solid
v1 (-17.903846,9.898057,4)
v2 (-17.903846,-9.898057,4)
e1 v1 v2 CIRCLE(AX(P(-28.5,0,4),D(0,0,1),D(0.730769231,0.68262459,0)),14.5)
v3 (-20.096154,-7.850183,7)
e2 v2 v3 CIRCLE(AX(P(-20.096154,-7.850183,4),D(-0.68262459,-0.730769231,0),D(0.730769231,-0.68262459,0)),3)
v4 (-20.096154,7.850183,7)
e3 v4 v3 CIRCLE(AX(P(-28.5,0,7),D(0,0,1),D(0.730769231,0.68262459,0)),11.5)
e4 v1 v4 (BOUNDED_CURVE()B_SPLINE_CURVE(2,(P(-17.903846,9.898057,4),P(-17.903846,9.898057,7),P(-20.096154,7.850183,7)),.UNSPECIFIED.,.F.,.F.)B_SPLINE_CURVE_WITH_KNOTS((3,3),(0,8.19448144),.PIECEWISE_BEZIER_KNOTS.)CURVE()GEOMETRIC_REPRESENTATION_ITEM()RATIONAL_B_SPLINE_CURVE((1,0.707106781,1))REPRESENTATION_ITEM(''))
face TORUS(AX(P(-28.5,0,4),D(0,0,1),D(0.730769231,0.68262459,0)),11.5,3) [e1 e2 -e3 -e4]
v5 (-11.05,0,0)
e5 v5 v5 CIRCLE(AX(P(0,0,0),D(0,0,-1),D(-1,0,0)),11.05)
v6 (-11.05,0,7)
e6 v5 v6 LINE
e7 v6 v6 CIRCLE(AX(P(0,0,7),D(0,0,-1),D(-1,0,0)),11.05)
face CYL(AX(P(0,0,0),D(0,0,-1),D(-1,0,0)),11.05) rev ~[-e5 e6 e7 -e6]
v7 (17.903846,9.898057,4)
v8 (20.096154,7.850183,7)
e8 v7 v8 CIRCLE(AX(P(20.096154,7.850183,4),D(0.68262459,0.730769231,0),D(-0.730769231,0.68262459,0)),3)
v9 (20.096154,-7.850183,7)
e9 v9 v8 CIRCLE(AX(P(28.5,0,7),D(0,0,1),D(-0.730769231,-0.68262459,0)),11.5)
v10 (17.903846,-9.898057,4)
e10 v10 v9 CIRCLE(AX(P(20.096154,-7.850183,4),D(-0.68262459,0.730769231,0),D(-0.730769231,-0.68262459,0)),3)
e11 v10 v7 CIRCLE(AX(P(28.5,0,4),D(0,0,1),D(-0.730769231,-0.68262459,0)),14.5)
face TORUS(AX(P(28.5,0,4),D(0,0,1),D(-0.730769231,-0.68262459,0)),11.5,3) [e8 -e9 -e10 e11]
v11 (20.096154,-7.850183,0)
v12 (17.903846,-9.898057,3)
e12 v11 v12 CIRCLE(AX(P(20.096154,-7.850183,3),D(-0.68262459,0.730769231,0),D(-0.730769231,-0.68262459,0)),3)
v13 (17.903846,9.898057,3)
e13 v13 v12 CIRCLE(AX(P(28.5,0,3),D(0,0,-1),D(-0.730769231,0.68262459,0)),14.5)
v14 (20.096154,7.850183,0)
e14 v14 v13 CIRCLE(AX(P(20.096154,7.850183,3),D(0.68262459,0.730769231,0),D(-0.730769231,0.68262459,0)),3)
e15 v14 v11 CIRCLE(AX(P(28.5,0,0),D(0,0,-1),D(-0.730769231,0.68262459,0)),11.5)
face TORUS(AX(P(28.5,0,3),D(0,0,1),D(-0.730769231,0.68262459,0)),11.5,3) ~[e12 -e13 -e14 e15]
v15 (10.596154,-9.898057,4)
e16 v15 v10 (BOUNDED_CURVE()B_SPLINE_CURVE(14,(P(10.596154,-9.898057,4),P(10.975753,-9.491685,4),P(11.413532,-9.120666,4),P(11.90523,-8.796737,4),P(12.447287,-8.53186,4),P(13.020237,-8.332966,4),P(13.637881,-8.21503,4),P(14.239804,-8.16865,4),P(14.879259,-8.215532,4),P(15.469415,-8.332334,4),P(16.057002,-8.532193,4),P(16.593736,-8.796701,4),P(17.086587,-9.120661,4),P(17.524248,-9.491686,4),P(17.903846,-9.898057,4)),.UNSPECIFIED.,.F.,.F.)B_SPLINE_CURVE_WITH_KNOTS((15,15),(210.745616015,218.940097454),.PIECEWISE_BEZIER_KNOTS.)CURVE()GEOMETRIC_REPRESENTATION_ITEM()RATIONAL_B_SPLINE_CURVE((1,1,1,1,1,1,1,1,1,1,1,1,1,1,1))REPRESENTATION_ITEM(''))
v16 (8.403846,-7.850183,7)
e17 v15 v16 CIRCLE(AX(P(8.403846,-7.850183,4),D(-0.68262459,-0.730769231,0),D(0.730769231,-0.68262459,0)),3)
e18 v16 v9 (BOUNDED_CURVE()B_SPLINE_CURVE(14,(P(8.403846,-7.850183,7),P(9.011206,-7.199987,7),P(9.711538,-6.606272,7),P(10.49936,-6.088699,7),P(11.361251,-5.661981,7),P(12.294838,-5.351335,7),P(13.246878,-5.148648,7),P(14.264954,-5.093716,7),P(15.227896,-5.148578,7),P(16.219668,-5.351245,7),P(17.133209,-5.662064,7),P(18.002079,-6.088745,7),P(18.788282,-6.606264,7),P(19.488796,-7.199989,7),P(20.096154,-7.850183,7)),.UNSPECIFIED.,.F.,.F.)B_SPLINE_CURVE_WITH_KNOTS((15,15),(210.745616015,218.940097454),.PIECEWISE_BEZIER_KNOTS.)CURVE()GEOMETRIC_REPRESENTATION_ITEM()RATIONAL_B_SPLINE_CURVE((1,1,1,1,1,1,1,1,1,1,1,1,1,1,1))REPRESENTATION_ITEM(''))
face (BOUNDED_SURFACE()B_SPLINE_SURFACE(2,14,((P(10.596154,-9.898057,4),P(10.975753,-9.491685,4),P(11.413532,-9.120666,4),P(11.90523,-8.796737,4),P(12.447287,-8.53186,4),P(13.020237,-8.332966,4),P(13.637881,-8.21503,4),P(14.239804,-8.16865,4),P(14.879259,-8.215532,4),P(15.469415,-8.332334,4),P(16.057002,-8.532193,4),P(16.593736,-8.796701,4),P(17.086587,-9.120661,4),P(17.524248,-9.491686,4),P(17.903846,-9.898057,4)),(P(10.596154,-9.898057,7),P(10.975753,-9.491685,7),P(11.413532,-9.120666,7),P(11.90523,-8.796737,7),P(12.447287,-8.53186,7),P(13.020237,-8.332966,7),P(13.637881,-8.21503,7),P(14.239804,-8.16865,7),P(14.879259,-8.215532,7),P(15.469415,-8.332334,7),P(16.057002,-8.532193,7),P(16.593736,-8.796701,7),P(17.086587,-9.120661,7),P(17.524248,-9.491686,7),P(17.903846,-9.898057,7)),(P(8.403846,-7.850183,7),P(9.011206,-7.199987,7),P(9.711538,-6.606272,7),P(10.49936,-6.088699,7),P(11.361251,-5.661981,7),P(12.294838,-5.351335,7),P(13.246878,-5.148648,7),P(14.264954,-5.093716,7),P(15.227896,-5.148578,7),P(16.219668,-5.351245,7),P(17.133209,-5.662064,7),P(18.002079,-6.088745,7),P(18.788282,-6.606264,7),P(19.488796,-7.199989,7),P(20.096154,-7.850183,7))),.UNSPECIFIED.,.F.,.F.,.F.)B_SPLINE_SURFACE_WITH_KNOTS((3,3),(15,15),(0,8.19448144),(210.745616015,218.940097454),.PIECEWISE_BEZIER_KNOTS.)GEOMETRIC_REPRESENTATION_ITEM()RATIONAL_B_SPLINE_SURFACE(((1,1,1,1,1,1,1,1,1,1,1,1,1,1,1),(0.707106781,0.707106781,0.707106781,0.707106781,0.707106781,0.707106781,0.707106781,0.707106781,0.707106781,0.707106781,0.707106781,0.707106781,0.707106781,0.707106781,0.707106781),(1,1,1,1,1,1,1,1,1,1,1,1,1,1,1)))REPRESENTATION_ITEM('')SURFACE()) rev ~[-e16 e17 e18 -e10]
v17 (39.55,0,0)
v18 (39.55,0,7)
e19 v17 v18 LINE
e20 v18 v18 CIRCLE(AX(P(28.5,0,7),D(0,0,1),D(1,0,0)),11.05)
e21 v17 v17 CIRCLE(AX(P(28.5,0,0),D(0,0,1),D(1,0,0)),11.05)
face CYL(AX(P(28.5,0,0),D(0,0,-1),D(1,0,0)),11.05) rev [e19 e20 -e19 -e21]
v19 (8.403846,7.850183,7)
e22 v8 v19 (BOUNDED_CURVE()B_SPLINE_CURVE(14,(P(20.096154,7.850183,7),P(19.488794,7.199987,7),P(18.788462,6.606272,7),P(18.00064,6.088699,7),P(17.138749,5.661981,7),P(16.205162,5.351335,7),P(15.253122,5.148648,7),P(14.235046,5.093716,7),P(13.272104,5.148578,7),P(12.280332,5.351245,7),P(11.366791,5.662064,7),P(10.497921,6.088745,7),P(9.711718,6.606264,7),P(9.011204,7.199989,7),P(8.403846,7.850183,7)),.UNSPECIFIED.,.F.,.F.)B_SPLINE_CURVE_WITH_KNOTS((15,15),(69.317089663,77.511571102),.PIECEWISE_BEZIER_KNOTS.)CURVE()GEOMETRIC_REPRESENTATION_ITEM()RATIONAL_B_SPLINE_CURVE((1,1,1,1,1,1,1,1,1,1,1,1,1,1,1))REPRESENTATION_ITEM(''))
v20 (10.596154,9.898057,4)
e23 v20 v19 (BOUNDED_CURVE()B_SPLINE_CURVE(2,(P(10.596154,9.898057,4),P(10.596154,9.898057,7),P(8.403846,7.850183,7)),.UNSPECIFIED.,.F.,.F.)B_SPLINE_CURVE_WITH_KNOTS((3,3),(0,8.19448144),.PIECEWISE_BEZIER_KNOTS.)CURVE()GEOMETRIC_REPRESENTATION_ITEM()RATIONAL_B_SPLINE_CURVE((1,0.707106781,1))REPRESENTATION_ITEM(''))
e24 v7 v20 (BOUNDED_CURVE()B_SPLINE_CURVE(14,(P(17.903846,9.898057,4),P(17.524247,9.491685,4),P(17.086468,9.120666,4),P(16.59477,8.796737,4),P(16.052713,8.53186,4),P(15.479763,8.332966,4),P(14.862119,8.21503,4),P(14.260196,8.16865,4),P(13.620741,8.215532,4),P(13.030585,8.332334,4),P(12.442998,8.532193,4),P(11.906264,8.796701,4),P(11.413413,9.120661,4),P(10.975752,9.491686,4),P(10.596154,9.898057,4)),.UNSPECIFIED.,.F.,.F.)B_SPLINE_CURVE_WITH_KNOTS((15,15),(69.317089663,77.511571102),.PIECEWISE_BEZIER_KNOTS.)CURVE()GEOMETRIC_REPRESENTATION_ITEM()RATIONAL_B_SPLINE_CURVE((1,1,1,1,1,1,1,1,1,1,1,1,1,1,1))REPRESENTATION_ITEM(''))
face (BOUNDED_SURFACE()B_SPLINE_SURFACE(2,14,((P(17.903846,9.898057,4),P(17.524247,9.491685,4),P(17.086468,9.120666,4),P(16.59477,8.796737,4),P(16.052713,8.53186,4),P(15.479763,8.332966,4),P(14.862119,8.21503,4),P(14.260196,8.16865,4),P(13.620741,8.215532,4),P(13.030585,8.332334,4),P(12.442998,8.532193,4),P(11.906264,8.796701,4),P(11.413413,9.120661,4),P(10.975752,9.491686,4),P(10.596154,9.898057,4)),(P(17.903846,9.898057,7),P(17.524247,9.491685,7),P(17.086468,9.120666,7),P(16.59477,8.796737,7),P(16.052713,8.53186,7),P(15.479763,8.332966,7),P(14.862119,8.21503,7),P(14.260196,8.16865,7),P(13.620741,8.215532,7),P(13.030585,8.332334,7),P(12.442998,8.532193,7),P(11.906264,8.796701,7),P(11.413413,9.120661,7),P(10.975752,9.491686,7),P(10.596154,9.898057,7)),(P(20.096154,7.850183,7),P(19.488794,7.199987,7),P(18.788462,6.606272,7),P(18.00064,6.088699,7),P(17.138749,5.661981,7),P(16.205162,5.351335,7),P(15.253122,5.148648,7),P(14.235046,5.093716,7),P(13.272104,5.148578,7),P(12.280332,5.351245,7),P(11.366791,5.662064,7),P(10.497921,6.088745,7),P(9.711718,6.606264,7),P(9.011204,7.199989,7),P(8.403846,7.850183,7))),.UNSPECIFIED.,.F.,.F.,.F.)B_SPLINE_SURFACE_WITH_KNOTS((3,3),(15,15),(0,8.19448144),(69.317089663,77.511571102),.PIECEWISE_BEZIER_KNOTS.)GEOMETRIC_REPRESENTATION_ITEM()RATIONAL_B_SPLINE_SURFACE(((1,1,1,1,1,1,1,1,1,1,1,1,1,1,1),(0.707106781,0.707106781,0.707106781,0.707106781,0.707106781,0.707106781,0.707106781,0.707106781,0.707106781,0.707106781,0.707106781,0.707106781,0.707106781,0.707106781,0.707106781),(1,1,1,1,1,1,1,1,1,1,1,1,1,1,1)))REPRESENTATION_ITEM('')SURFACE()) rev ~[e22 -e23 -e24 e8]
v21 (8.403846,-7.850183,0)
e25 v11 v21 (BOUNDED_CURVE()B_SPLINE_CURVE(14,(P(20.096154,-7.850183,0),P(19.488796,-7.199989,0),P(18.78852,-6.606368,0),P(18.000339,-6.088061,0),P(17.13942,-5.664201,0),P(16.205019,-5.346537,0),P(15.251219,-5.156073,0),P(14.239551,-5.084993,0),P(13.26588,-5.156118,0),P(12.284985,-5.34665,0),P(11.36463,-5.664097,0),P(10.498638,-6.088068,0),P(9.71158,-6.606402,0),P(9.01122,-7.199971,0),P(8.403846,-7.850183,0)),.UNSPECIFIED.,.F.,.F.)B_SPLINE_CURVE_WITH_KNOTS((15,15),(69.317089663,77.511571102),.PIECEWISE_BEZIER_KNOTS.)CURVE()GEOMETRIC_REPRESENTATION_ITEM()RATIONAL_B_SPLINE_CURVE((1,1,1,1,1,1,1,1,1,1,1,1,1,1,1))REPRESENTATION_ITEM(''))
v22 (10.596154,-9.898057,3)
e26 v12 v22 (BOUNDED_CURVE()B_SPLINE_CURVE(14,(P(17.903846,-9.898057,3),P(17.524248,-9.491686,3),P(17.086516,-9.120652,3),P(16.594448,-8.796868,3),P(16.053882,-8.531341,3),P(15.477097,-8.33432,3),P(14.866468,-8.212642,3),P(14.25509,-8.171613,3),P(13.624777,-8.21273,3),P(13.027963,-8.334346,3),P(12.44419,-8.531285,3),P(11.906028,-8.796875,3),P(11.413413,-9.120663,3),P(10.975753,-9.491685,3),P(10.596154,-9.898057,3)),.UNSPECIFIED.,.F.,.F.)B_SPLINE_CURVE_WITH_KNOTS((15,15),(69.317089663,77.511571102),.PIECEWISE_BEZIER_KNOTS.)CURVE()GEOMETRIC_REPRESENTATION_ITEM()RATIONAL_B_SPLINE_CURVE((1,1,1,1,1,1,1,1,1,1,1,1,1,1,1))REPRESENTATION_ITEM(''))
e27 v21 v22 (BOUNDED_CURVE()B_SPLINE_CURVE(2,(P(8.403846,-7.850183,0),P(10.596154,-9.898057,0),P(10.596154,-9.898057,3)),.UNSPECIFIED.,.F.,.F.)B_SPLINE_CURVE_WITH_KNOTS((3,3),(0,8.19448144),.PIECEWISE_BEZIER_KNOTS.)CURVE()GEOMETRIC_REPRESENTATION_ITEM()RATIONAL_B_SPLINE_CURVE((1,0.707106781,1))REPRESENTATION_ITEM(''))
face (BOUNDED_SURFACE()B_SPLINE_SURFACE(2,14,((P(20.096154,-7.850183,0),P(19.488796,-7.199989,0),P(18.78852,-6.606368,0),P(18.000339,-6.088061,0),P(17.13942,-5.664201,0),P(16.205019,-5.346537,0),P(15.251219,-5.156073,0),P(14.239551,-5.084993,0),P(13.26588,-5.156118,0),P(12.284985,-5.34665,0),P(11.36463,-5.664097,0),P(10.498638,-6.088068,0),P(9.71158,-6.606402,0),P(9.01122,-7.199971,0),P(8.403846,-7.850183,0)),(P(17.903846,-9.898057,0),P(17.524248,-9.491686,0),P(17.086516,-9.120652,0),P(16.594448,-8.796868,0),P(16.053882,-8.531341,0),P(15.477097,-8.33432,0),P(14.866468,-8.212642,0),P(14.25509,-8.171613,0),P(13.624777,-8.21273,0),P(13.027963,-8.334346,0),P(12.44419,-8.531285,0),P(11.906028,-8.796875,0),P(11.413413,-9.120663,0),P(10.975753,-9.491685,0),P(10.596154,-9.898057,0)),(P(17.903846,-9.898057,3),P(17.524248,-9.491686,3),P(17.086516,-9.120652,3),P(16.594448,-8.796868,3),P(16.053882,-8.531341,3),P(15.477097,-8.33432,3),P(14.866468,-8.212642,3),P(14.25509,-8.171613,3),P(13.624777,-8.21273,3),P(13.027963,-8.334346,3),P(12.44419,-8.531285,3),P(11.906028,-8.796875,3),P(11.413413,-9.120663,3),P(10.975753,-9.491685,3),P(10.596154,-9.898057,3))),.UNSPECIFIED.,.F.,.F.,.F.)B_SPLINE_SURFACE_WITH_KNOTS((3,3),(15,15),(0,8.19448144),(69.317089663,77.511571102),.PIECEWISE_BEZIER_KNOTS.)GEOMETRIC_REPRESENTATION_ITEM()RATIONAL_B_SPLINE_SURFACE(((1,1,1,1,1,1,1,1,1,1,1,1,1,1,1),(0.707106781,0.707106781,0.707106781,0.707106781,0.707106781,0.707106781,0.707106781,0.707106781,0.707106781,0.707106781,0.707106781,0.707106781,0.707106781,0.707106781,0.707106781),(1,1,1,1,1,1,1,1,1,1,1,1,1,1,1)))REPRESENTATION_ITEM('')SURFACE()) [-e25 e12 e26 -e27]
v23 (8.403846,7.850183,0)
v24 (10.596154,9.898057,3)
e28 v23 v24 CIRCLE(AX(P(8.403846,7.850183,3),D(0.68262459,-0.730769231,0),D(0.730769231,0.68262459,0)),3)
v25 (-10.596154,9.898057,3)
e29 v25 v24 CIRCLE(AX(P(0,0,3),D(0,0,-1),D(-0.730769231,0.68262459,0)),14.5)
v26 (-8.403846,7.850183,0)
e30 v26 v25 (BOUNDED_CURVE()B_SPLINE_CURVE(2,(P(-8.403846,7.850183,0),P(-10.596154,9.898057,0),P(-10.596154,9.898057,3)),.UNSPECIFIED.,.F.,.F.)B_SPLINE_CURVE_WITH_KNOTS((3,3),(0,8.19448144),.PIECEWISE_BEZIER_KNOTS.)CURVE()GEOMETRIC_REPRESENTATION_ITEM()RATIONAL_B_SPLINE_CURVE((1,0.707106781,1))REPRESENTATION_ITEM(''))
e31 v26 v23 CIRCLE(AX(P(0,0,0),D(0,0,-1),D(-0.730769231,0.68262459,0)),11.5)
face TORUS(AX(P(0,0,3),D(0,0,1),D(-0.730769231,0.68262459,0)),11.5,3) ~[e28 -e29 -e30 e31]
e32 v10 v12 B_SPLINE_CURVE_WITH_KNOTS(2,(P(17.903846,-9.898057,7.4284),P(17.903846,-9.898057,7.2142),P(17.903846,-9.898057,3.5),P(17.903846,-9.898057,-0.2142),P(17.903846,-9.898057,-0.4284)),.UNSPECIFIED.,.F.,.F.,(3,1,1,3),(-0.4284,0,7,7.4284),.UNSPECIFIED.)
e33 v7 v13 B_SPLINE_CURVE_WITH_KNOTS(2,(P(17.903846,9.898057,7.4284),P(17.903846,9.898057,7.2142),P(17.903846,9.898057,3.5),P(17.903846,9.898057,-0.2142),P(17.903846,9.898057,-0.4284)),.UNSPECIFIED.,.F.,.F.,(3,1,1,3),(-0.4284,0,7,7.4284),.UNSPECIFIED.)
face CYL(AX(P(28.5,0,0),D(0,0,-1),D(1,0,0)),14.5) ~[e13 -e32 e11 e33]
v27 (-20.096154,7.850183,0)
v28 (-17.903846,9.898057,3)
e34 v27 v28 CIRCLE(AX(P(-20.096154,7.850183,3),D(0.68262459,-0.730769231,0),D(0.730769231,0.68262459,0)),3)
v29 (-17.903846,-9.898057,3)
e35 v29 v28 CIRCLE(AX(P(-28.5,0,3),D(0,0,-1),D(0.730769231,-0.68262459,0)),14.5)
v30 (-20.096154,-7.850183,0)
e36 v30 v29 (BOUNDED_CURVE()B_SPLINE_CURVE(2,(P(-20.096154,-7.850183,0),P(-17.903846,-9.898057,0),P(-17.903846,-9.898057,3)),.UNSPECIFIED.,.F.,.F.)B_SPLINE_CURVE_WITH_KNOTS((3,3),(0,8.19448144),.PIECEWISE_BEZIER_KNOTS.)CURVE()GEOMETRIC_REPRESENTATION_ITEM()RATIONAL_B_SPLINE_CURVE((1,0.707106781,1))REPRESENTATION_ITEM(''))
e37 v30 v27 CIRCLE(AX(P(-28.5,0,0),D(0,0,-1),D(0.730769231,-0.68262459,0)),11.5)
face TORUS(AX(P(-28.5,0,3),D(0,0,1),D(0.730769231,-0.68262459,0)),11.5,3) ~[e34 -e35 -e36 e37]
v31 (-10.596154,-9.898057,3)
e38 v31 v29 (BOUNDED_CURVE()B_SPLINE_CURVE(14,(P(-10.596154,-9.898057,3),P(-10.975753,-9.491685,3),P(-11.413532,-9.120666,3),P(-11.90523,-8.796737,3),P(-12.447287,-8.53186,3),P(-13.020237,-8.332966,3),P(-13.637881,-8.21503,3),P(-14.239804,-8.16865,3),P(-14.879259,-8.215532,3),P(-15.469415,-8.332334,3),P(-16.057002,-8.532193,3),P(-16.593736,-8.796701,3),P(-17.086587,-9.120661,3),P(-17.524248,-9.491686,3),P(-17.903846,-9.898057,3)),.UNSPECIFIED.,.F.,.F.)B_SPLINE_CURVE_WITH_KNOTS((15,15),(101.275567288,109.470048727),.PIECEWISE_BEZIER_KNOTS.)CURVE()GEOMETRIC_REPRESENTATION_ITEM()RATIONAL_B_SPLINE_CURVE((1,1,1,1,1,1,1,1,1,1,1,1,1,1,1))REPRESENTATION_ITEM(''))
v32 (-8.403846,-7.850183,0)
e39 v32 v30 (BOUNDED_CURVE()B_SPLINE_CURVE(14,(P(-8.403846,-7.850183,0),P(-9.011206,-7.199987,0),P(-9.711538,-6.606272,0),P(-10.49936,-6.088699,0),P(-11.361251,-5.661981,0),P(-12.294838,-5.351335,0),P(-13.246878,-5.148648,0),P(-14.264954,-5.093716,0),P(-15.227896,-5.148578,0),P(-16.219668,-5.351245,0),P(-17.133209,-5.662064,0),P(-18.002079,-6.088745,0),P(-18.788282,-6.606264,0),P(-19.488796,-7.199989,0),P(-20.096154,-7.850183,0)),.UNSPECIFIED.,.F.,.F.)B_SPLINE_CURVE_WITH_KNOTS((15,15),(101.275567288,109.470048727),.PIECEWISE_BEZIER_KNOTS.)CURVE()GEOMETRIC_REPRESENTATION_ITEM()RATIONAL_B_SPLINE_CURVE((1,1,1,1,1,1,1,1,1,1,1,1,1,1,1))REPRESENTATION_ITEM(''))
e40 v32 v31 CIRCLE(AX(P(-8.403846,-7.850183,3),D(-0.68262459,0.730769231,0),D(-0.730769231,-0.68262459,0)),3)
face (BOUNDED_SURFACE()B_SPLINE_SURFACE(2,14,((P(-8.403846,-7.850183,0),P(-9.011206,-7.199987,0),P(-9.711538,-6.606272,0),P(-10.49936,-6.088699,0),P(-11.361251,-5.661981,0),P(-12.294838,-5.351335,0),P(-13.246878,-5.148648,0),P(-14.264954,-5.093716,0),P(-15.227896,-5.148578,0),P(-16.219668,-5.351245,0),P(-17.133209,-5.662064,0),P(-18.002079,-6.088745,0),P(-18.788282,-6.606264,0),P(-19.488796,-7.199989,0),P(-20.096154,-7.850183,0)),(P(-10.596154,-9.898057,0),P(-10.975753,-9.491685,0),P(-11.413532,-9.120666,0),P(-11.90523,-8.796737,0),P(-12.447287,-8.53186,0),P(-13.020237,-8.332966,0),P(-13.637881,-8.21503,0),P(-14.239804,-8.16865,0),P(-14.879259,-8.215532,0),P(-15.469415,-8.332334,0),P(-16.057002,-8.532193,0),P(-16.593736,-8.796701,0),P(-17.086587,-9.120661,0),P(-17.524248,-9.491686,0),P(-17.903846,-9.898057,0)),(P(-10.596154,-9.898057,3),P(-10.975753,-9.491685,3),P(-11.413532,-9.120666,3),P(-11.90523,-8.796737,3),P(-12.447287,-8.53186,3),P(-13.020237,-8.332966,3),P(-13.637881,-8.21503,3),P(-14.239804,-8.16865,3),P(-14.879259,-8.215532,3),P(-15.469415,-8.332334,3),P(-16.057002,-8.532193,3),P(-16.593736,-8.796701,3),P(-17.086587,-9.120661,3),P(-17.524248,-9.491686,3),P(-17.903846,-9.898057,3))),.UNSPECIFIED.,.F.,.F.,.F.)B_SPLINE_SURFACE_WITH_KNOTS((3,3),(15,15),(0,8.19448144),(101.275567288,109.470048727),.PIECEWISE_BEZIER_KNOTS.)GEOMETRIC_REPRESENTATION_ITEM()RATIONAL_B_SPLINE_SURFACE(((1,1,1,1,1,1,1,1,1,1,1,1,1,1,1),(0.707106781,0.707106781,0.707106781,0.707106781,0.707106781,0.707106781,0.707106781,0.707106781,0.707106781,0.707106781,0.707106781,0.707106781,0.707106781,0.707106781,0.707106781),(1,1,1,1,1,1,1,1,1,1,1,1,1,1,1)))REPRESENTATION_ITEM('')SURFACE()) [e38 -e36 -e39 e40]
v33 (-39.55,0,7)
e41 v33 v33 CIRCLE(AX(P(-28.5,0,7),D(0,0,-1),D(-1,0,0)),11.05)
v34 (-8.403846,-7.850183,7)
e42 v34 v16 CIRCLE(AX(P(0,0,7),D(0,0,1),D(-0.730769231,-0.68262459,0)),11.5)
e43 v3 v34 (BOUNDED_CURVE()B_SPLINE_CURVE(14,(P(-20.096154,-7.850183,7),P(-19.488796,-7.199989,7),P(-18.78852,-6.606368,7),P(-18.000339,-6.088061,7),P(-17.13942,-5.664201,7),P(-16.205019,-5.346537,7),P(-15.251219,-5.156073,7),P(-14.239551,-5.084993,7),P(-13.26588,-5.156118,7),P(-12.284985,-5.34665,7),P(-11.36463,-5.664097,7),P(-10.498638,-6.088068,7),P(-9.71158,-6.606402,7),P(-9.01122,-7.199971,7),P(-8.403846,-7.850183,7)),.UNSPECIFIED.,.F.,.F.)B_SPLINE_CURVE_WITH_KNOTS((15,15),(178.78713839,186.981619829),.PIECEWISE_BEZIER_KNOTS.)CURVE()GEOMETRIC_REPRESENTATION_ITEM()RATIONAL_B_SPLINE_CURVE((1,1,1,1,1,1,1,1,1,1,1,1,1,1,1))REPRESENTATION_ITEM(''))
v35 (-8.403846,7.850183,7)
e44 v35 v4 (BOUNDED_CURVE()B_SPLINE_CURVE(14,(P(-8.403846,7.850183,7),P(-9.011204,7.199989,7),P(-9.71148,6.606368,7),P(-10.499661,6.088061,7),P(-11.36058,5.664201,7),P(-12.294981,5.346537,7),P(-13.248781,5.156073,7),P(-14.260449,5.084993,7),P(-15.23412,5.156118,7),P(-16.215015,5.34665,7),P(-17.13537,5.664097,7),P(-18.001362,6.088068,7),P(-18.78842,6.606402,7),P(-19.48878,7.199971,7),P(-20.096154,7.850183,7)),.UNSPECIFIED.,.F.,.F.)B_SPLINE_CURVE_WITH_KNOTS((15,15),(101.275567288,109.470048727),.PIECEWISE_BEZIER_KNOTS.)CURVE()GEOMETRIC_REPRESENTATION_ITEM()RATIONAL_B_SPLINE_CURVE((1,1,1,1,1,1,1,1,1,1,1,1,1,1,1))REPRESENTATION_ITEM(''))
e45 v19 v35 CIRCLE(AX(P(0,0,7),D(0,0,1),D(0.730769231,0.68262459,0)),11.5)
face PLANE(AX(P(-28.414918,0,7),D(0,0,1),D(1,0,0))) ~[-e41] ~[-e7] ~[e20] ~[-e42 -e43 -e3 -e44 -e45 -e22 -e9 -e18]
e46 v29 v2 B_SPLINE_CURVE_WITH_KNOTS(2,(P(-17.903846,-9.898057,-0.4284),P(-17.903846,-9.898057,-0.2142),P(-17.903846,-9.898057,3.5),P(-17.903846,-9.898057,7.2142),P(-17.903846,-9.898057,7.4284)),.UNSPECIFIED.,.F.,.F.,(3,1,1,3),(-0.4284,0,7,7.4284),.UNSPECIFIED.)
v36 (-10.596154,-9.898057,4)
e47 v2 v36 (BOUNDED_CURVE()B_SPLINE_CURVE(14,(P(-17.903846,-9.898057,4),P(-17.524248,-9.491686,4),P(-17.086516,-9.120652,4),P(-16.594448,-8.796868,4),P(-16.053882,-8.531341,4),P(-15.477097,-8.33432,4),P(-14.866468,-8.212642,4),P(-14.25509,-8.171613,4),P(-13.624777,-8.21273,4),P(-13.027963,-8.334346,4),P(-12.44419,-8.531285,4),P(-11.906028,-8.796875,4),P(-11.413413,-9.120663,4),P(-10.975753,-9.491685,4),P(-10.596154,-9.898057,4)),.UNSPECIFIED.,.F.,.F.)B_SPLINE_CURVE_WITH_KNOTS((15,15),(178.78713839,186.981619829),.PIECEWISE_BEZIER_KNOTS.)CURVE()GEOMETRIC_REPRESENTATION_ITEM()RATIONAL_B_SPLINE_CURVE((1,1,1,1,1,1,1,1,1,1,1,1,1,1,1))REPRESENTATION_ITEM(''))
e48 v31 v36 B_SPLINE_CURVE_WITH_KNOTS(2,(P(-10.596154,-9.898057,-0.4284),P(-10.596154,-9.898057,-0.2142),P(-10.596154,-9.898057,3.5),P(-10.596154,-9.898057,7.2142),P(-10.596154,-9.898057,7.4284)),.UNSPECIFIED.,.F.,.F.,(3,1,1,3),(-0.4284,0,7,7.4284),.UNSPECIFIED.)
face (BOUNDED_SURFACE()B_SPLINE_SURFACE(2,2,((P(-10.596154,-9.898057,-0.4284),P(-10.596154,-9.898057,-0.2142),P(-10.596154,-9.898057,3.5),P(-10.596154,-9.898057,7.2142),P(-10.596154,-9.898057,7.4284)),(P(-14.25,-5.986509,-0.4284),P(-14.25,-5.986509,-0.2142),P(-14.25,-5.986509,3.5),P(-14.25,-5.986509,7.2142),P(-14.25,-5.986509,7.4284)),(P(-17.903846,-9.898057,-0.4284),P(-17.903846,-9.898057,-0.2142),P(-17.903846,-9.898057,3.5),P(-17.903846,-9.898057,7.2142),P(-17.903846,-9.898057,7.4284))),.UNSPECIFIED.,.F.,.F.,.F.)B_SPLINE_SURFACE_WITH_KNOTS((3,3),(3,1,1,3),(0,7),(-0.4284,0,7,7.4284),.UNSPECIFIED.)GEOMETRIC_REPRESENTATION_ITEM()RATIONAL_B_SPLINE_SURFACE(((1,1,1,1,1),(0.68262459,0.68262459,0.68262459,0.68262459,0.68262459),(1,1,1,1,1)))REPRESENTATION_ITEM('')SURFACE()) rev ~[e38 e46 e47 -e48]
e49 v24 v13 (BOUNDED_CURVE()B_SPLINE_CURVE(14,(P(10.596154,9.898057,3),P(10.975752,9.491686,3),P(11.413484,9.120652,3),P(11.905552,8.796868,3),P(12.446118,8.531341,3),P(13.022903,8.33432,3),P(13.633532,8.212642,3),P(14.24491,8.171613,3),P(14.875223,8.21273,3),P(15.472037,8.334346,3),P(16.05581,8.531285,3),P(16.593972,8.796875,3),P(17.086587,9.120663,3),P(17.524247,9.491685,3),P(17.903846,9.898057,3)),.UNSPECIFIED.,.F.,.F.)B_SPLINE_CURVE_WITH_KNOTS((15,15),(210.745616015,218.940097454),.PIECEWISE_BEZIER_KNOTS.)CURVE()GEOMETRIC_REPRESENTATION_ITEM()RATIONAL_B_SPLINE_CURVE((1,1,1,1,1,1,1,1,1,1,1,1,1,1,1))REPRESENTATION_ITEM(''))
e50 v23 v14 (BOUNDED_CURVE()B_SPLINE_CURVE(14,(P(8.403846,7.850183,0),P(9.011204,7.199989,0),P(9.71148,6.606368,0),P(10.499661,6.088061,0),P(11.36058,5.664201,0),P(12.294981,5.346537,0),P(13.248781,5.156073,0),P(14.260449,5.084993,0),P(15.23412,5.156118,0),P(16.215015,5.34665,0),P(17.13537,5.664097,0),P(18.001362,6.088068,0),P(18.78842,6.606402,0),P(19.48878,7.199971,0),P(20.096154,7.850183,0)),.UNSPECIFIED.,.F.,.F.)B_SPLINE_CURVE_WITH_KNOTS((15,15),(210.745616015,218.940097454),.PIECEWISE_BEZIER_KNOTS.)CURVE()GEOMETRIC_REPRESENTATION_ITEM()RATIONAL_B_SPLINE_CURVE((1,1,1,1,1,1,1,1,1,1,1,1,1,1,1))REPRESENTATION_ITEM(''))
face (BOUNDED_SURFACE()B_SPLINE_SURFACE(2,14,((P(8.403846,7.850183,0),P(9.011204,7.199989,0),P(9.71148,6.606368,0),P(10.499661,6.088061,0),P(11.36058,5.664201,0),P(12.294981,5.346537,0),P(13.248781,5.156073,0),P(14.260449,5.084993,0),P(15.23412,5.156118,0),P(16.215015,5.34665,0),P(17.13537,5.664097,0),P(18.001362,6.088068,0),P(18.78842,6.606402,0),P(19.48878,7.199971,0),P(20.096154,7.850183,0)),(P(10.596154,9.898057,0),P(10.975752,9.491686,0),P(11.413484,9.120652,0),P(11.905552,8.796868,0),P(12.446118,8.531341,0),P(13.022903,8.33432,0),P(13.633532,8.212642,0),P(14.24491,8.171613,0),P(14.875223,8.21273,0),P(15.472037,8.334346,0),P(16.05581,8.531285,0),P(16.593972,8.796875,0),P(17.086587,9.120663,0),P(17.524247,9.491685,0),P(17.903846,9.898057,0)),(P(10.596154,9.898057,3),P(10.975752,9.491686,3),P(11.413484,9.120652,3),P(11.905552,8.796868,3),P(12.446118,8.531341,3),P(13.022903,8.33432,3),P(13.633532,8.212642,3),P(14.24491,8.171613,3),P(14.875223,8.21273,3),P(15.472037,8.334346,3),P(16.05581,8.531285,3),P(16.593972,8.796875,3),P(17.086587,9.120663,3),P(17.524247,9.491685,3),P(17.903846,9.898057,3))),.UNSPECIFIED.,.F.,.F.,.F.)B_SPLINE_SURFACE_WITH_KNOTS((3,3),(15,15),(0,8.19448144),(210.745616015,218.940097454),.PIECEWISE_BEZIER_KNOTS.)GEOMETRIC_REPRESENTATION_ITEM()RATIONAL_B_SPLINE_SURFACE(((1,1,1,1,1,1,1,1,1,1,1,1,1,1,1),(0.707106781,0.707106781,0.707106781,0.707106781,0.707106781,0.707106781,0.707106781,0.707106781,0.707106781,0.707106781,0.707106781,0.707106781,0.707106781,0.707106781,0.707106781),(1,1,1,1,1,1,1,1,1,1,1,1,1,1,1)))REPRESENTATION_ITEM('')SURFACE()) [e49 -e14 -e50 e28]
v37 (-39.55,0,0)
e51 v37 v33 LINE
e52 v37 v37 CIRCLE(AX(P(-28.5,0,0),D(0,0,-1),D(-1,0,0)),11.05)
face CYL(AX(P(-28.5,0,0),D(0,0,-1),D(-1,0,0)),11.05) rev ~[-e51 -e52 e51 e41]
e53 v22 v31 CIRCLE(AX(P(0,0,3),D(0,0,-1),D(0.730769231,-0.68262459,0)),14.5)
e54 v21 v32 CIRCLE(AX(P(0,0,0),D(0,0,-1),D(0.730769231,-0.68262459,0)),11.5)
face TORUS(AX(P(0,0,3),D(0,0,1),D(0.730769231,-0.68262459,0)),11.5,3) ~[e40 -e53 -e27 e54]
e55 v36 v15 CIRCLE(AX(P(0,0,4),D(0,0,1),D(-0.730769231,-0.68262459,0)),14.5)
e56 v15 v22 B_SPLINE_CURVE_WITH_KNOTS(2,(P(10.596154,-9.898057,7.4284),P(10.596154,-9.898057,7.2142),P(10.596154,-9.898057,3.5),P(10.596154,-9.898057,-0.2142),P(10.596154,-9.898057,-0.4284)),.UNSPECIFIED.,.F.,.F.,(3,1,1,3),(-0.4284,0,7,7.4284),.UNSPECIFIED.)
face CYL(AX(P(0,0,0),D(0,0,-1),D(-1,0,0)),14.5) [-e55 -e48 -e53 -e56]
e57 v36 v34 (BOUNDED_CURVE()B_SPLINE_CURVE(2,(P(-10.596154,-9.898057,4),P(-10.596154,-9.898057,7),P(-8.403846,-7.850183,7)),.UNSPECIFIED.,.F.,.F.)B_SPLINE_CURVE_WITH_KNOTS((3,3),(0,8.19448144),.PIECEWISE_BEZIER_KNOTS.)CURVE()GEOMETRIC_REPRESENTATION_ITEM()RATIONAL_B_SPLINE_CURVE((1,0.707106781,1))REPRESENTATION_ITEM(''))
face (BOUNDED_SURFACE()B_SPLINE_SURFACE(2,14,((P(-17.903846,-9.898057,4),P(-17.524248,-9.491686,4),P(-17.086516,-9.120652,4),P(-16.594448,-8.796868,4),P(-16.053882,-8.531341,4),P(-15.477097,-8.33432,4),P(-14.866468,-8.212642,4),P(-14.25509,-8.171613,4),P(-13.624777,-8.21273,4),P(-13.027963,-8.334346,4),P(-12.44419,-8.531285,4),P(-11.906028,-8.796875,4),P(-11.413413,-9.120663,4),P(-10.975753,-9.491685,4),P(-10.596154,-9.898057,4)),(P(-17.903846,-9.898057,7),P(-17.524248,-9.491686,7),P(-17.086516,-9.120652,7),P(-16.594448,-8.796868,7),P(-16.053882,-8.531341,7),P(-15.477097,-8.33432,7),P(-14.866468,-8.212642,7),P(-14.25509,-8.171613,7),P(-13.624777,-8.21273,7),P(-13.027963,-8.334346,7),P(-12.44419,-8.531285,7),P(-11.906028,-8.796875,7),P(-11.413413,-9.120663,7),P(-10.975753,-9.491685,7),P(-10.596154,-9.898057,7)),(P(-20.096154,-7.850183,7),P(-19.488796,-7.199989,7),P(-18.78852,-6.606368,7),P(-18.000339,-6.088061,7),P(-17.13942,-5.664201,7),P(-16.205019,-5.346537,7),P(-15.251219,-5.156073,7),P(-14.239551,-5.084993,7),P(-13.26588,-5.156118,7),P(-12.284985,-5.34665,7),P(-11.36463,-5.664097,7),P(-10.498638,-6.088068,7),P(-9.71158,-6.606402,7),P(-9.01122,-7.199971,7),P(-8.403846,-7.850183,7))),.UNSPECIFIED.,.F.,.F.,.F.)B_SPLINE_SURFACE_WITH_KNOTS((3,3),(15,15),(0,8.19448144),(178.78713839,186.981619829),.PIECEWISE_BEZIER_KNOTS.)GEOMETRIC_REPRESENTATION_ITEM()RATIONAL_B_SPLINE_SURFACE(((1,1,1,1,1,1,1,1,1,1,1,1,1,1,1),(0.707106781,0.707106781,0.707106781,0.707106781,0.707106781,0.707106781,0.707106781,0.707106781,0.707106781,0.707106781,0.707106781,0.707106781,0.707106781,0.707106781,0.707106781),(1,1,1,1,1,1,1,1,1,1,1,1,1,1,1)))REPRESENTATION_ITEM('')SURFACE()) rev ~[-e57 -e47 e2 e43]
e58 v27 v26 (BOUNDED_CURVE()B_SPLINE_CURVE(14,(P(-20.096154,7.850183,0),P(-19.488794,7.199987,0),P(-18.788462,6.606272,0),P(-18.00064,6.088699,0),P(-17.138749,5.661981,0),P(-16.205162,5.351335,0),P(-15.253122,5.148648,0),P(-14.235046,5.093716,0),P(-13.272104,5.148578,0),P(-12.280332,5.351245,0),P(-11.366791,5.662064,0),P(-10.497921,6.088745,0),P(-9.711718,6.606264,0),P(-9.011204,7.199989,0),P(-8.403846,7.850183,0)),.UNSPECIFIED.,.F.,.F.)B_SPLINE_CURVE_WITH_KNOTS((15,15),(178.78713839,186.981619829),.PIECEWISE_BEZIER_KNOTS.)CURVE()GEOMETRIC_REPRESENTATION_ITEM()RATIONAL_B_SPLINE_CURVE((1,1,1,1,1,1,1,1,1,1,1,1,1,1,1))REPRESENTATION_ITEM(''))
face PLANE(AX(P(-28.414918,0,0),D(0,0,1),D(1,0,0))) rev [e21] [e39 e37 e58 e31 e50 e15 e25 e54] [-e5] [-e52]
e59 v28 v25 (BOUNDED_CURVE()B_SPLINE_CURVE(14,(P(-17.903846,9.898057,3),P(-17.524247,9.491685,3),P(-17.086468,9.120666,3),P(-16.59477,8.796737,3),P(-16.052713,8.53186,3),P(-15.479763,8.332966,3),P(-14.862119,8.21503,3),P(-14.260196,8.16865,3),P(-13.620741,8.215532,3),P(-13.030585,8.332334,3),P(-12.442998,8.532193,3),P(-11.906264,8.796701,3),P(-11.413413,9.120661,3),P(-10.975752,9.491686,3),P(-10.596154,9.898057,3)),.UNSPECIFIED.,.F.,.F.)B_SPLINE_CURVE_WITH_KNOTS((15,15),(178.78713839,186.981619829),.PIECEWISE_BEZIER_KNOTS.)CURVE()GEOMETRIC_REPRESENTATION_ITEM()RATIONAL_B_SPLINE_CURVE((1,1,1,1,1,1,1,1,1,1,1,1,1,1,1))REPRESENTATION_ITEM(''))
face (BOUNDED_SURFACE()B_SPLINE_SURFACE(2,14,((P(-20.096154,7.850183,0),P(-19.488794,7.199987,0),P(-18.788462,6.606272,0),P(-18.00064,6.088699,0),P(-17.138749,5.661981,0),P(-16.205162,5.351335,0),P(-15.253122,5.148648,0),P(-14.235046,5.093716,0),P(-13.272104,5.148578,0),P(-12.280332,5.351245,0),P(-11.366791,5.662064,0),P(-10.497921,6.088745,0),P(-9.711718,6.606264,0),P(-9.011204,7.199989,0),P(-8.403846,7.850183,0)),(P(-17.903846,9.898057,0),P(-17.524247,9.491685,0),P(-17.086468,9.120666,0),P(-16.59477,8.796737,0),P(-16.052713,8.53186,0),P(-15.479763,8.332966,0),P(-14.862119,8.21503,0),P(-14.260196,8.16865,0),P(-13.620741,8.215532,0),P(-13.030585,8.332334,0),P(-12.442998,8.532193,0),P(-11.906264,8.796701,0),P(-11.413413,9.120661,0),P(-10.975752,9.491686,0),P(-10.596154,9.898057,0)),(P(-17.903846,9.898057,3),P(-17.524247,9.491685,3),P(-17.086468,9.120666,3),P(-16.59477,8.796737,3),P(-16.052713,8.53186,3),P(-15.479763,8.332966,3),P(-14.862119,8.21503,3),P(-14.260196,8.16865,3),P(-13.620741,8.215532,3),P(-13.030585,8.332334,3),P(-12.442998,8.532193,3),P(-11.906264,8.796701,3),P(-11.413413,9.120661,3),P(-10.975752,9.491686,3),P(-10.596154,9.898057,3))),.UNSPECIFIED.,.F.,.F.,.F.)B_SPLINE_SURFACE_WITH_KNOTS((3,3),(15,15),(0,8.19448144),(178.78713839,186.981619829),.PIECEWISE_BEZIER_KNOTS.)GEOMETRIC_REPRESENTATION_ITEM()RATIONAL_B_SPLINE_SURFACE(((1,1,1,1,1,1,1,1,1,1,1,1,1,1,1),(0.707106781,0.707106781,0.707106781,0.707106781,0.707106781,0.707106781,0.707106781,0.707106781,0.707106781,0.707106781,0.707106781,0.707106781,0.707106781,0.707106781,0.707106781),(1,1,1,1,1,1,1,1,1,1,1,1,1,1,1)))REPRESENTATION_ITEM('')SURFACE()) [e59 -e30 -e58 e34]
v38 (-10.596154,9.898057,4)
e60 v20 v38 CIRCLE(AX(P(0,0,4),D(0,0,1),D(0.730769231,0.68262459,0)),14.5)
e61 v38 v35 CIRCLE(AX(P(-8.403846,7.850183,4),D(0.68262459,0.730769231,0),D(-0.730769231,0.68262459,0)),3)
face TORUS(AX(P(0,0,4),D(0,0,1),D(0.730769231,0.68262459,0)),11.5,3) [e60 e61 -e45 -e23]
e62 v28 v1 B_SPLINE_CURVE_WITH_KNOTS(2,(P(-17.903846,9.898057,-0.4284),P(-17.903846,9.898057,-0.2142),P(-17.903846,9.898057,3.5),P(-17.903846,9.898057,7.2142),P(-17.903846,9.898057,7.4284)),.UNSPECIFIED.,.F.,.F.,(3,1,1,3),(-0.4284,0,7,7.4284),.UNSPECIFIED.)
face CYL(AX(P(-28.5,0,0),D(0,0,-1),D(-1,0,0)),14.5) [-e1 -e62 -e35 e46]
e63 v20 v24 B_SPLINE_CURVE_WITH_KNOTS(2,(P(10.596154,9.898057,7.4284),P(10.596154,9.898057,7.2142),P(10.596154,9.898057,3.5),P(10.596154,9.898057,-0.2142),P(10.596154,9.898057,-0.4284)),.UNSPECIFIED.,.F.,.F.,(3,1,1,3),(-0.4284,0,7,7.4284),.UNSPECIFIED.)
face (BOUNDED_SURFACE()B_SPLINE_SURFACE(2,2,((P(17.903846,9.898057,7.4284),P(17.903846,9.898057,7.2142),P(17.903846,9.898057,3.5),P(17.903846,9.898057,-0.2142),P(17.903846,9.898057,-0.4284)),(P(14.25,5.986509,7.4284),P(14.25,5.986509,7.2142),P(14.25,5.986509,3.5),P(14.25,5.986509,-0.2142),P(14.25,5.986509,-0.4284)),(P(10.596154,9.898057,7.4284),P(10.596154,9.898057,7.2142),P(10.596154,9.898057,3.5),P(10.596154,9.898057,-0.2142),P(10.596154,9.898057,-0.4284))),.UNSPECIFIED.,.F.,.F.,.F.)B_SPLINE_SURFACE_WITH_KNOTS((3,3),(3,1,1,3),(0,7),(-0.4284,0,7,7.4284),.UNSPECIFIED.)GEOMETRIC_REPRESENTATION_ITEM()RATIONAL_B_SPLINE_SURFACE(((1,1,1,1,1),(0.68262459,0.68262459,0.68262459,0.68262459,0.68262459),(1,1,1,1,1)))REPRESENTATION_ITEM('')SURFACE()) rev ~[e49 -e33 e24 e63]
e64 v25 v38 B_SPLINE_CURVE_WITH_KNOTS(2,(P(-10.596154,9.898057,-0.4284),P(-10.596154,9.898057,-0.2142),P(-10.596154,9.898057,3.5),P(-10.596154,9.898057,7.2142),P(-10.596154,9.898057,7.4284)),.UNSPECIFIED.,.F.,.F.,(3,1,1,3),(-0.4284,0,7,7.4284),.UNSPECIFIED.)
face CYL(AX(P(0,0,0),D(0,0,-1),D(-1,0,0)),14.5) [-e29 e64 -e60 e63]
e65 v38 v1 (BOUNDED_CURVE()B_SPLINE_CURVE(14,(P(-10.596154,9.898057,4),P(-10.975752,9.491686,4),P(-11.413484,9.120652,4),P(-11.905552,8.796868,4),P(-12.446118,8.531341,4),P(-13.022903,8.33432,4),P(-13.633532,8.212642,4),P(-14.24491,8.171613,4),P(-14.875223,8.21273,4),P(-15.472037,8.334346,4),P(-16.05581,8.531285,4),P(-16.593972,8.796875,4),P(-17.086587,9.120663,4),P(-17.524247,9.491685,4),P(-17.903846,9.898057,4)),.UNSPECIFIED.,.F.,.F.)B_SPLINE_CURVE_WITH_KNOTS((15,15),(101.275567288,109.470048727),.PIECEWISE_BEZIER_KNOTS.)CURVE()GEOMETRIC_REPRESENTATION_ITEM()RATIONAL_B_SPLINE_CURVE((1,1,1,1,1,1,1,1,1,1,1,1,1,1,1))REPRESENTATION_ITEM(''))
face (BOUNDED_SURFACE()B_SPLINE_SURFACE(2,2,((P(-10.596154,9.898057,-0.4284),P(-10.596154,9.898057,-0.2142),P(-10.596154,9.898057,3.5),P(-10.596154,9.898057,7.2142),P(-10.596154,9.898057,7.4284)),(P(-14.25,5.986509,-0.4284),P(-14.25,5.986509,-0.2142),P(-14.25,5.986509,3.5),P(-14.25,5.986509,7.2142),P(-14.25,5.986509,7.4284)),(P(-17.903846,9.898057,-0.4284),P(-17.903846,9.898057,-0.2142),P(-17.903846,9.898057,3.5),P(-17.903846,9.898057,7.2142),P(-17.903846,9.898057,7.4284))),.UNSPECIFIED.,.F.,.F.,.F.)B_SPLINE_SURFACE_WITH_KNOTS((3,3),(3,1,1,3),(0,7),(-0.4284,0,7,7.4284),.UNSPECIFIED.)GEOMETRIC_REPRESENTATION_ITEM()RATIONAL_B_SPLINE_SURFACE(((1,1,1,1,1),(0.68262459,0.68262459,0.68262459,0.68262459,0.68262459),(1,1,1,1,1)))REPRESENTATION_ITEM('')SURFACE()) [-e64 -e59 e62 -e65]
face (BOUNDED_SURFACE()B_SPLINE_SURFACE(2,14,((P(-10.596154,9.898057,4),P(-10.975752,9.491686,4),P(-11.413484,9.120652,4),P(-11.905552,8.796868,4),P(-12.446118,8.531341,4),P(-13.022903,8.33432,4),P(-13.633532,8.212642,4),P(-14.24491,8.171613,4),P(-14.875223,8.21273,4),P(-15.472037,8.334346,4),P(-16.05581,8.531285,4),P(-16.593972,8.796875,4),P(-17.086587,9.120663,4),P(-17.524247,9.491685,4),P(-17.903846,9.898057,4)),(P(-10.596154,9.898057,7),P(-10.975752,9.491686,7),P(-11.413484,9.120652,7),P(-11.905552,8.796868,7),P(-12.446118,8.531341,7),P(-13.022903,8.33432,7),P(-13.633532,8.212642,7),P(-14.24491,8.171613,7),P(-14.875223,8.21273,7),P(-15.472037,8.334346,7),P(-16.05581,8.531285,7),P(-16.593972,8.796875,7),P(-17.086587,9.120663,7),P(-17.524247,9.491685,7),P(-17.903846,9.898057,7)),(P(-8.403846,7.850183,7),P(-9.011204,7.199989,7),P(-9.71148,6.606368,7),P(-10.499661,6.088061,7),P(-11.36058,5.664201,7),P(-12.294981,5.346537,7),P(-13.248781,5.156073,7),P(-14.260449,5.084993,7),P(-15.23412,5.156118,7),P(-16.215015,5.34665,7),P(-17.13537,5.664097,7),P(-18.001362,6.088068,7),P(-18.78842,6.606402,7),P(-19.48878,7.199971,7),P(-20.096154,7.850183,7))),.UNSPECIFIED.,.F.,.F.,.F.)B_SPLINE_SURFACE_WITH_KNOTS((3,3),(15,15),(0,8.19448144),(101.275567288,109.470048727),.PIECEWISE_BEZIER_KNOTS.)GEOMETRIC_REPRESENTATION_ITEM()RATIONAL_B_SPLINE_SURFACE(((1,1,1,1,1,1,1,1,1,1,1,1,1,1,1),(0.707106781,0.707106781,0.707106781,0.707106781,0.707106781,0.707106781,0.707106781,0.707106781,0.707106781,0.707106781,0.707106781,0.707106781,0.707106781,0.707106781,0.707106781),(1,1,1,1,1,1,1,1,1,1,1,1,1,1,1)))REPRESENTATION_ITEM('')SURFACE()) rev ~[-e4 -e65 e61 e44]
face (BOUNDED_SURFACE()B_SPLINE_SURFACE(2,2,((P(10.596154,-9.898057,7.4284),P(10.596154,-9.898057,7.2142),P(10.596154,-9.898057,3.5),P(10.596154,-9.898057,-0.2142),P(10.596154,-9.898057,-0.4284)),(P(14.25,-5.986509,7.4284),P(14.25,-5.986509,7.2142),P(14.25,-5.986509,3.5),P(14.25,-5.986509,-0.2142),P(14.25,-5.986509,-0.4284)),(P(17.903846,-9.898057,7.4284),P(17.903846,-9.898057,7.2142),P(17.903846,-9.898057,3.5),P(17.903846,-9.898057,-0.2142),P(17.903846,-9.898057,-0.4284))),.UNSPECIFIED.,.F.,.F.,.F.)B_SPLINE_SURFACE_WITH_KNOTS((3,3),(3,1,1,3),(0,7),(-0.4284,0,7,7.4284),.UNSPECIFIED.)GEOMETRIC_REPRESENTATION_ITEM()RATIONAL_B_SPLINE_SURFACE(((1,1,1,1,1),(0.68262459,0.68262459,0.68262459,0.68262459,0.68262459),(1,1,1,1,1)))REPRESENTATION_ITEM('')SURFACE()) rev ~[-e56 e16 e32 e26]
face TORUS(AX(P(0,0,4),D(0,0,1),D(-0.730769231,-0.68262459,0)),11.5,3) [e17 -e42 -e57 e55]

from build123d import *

# Parameters (mm, degrees)
F0_R     = 11.05
F1_DEPTH = 7
F2_R     = 5
F3_R     = 3


# Not quite as in the source:
# - a pattern or mirror of a feature is missing from the dataset's text; its kind, count and spacing are read off the source's solid
# - a feature names something its author has since deleted; it is built from what else it names


with BuildPart() as f1:
    # F0 (on Top) → F1 (new body)
    with BuildSketch(Plane.XY):
        with BuildLine():
            ThreePointArc((14.25, 2.6809513237), (14.437364718, 1.3462912018), (14.5, 0))
            ThreePointArc((14.5, 0), (14.437364718, -1.3462912018), (14.25, -2.6809513237))
            ThreePointArc((14.25, -2.6809513237), (29.8462912018, -14.437364718), (43, 0))
            ThreePointArc((43, 0), (29.8462912018, 14.437364718), (14.25, 2.6809513237))
        make_face()
        with Locations((28.5, 0)):
            Circle(F0_R, mode=Mode.SUBTRACT)
        with BuildLine():
            ThreePointArc((14.25, -2.6809513237), (14.437364718, -1.3462912018), (14.5, 0))
            ThreePointArc((14.5, 0), (14.437364718, 1.3462912018), (14.25, 2.6809513237))
            ThreePointArc((14.25, 2.6809513237), (14, 0), (14.25, -2.6809513237))
        make_face()
    extrude(amount=F1_DEPTH)


with BuildPart() as f1b:
    # F0 (on Top) → F1, piece 2 (new body)
    with BuildSketch(Plane.XY):
        with BuildLine():
            ThreePointArc((-14, 0), (-14.062635282, 1.3462912018), (-14.25, 2.6809513237))
            ThreePointArc((-14.25, 2.6809513237), (-14.5, 0), (-14.25, -2.6809513237))
            ThreePointArc((-14.25, -2.6809513237), (-14.062635282, -1.3462912018), (-14, 0))
        make_face()
    extrude(amount=F1_DEPTH)

    # F1_copies: F1 across plane
    add(f1.part.mirror(Plane(origin=(0, 0, 0), x_dir=(0, 0, -1), z_dir=(-1, 0, 0))))


with BuildPart() as f1_1:
    add(f1.part)

    add(f1b.part)  # F1_copies1 merges F1b
    # F1_copies1: F1 across plane
    add(f1.part.mirror(Plane(origin=(14.25, 0, 0), x_dir=(0, 0, -1), z_dir=(-1, 0, 0))))

    # F2
    f2_edges = [f1_1.edges().sort_by_distance(p)[0] for p in [
        (-14.25, -2.680951, 3.5),
        (14.25, -2.680951, 3.5),
        (14.25, 2.680951, 3.5),
        (-14.25, 2.680951, 3.5),
    ]]
    fillet(f2_edges, radius=F2_R)

    # F3
    f3_edges = [f1_1.edges().sort_by_distance(p)[0] for p in [
        (43, 0, 7),
        (43, 0, 0),
        (-43, 0, 0),
        (-43, 0, 7),
        (-14.25, 8.31118, 0),
        (-14.25, -8.31118, 0),
        (0, 14.5, 0),
        (0, -14.5, 0),
        (14.25, 8.31118, 0),
        (14.25, -8.31118, 0),
        (-14.25, 8.31118, 7),
        (-14.25, -8.31118, 7),
        (0, -14.5, 7),
        (0, 14.5, 7),
        (14.25, -8.31118, 7),
        (14.25, 8.31118, 7),
    ]]
    fillet(f3_edges, radius=F3_R)


solid = f1_1.part
